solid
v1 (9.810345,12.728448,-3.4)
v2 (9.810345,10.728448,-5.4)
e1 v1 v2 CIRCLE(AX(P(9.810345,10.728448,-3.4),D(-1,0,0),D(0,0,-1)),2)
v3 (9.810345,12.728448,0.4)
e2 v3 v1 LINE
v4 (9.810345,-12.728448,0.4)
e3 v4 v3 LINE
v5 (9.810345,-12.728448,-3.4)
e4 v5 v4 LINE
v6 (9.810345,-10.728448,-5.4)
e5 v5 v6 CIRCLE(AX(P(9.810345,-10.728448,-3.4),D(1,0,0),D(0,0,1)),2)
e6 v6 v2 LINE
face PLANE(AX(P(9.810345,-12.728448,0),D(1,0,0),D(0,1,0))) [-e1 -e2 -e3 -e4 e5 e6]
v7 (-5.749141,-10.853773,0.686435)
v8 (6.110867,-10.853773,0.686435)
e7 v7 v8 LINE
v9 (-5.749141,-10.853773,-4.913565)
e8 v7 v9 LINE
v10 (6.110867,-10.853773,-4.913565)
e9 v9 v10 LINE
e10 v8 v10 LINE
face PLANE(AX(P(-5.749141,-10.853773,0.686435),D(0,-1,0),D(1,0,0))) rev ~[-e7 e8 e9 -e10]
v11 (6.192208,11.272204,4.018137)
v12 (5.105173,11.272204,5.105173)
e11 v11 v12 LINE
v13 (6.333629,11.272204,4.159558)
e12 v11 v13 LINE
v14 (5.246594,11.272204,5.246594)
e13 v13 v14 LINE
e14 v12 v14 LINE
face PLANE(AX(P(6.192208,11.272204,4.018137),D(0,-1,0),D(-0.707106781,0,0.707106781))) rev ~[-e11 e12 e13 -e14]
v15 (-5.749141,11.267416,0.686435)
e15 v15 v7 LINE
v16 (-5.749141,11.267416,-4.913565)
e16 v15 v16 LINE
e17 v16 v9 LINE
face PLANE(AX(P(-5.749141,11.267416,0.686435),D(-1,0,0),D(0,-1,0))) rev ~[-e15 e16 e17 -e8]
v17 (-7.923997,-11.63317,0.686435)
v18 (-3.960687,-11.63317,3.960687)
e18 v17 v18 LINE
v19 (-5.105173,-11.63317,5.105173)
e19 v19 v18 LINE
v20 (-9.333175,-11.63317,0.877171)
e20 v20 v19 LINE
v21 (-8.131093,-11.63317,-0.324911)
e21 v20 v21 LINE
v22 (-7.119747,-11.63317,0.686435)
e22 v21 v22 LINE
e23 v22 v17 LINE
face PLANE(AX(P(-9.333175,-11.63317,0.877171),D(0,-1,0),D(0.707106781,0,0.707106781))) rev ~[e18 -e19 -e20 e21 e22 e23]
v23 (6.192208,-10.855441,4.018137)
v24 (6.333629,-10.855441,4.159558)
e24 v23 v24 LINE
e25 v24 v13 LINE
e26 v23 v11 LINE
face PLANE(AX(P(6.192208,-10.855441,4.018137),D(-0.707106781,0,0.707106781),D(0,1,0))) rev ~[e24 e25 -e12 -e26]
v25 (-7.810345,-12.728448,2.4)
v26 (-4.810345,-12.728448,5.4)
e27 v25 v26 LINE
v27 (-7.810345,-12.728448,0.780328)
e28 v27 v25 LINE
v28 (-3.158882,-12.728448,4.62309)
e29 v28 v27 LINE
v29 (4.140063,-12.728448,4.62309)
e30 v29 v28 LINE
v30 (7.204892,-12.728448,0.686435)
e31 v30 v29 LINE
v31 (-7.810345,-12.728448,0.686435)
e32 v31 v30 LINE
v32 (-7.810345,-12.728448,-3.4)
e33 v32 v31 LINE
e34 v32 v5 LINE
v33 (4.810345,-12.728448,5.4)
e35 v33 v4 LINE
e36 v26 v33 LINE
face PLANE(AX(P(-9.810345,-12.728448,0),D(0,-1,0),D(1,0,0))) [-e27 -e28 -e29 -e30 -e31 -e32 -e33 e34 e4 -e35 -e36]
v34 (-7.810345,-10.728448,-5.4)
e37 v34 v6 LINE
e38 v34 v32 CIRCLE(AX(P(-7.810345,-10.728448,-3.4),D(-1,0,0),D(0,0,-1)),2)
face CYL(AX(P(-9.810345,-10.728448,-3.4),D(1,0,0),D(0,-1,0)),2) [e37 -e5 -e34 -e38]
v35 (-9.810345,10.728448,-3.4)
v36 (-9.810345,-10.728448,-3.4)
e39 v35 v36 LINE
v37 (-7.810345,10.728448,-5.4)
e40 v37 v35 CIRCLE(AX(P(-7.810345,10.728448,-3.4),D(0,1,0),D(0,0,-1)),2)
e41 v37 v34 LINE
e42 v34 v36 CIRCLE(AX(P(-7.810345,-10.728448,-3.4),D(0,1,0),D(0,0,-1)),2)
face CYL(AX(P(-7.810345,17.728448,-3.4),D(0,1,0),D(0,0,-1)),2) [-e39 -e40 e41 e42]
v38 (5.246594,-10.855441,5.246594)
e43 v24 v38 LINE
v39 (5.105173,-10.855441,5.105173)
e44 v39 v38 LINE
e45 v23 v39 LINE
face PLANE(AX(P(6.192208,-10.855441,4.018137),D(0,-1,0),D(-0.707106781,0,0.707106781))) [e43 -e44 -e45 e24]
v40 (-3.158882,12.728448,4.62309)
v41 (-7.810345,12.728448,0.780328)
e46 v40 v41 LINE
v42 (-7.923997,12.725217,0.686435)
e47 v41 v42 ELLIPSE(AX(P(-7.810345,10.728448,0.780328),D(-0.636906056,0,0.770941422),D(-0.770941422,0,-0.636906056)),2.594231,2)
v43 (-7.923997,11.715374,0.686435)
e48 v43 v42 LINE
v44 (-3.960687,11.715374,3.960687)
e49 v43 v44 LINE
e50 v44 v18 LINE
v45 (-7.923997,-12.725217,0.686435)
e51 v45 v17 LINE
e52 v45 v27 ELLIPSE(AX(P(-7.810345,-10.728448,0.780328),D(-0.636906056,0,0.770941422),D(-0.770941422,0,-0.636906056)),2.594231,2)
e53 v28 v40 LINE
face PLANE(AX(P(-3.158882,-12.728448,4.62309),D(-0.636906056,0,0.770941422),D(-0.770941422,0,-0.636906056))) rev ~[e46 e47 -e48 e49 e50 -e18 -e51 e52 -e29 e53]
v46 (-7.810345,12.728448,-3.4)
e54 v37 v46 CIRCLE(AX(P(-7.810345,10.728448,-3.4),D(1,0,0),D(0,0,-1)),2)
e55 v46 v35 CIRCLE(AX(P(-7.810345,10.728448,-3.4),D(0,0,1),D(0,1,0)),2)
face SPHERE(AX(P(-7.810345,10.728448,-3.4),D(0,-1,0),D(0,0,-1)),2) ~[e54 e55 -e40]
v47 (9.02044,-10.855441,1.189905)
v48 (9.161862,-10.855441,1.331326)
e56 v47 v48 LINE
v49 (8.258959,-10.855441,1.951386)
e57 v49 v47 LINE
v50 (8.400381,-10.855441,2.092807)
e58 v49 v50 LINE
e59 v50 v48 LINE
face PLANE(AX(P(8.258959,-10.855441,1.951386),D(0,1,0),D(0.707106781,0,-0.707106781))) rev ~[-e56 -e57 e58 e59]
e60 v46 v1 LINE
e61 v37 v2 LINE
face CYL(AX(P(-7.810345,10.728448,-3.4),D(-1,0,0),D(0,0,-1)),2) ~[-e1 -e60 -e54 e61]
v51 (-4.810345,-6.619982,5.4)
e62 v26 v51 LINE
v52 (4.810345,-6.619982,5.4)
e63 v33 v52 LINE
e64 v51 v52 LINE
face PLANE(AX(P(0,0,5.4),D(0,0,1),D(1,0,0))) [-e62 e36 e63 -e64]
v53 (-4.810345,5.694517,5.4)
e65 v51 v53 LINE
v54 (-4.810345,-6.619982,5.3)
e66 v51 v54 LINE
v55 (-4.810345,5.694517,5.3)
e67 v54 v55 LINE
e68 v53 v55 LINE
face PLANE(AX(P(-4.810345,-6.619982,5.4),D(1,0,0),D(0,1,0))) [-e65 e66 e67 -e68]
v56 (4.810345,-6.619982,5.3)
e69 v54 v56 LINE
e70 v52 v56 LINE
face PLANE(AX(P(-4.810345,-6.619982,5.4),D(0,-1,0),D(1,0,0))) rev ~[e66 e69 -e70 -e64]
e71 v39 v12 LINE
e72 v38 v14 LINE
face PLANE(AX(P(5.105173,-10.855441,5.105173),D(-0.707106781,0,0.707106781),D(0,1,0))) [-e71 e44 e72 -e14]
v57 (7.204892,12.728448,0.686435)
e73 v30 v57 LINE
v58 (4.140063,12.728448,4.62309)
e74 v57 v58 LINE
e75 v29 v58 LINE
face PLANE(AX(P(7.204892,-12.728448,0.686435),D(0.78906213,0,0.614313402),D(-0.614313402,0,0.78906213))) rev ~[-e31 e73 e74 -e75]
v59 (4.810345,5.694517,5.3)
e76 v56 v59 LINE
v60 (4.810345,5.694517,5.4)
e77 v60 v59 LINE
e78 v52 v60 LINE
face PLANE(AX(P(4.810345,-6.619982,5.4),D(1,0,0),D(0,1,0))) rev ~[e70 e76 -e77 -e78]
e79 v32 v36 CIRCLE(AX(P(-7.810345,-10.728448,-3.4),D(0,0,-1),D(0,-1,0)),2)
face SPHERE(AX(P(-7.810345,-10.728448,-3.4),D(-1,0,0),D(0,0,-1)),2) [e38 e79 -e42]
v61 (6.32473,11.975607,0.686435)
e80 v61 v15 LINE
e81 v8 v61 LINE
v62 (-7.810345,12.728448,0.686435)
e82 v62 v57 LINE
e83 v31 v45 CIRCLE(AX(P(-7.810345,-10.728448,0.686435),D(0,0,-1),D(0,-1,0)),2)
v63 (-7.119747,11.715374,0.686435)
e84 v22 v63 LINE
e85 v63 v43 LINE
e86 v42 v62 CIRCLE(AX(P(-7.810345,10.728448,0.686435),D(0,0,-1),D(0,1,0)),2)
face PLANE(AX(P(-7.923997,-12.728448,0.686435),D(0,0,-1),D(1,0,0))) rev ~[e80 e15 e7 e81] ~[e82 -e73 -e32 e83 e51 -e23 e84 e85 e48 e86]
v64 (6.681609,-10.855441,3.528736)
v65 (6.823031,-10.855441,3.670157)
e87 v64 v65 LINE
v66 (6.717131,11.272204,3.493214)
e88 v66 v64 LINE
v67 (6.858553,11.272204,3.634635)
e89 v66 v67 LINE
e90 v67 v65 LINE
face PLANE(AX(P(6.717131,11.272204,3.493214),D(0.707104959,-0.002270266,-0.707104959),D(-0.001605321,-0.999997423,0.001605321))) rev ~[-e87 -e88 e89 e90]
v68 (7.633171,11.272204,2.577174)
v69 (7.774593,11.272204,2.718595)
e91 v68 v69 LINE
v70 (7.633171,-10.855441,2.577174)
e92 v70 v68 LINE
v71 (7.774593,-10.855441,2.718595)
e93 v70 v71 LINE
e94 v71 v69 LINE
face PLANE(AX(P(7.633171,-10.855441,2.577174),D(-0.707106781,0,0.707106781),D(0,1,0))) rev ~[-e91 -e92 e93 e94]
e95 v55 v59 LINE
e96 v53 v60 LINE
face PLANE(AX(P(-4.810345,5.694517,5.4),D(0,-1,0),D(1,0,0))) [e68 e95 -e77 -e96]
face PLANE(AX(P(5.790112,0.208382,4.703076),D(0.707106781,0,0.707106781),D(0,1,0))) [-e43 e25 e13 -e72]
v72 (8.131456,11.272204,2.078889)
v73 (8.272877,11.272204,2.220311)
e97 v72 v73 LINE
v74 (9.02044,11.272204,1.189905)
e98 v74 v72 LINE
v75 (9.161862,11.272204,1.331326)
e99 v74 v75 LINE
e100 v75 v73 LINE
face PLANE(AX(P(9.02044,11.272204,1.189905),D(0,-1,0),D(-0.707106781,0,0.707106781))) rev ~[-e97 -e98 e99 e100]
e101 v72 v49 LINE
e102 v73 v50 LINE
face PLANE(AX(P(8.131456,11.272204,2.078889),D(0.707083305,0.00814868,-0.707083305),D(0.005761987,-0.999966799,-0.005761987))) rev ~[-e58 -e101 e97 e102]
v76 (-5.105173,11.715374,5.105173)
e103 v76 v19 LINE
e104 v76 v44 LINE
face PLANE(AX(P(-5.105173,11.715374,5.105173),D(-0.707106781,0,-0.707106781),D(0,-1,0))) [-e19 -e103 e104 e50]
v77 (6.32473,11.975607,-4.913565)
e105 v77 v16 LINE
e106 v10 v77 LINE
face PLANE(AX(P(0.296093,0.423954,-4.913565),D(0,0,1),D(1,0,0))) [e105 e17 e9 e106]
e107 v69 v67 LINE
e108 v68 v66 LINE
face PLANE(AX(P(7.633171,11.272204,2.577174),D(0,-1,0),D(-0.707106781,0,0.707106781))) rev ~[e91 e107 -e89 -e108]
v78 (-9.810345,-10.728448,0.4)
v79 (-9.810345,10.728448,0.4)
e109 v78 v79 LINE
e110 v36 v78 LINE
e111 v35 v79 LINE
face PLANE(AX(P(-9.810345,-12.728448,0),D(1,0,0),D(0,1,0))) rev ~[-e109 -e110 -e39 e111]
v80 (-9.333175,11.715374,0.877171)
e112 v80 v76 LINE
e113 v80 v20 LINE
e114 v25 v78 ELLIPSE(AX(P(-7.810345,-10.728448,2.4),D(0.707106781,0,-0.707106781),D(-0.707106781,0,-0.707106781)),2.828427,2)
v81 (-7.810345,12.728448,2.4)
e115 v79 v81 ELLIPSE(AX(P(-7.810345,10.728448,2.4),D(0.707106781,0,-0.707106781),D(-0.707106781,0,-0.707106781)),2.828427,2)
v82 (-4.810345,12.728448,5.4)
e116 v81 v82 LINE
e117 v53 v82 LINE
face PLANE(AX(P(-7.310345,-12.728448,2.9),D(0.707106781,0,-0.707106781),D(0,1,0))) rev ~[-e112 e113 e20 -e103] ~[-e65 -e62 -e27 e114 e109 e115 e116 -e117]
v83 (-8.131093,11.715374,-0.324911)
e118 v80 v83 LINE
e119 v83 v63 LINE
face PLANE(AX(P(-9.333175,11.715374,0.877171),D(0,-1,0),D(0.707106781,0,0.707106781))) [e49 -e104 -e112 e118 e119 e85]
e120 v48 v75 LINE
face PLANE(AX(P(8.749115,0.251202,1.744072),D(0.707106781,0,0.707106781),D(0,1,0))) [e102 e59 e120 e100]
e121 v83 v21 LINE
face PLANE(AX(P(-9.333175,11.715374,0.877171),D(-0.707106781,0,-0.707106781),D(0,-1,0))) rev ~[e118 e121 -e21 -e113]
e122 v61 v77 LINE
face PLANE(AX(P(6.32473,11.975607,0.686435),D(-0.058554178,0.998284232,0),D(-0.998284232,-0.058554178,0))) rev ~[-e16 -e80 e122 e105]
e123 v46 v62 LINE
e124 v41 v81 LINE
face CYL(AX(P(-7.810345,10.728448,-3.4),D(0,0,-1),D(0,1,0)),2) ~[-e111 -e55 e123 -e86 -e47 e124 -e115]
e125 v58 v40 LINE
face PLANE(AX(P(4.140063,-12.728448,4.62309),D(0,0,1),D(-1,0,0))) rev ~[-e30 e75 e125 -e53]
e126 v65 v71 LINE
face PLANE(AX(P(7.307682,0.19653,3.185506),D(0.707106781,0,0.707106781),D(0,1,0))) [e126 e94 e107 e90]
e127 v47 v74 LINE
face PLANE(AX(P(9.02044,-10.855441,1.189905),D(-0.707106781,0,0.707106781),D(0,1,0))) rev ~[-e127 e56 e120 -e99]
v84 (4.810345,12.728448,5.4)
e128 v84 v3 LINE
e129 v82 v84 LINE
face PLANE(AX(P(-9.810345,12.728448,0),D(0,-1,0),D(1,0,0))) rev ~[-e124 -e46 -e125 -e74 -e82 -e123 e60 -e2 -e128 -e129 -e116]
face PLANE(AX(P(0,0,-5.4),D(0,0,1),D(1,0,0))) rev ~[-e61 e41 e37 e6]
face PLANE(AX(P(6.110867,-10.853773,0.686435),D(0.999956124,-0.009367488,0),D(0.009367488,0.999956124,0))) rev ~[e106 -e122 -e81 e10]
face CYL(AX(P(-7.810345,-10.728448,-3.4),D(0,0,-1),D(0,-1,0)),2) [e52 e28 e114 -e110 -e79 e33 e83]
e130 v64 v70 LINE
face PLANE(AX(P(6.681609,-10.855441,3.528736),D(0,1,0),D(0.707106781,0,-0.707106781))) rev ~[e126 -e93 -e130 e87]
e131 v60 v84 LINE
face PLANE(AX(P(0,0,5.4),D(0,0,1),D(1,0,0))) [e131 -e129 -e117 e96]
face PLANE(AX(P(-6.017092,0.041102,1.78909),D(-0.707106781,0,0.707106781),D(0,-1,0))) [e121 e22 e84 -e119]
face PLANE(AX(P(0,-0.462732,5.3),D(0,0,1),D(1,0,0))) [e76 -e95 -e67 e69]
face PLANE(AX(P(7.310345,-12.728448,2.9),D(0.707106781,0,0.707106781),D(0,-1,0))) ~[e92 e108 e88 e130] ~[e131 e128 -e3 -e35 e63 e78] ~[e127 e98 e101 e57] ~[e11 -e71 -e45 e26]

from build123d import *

# Parameters (mm, degrees)
F0_W         = 19.62069033
F0_H         = 25.4568966
F1_DEPTH     = 5.4
F2_SIZE      = 5
F3_SIZE      = 5
F4_W         = 22.1276450902
F4_H         = 1.5373004135
F5_DEPTH     = 0.2
F7_DEPTH     = 25.5
F8_W         = 23.348543793
F8_H         = 5.9792976826
F9_DEPTH     = 1.7
F10_R        = 2
F11_T1_DEPTH = 28.4568966
F11_T3_DEPTH = 8.8
F11_T6_ANGLE = 90
F12_T1_DEPTH = 22.62069033
F12_T3_DEPTH = 8.8
F12_T6_ANGLE = 90.0000000053
F14_DEPTH    = 5.6
F15_W        = 9.62069033
F15_H        = 12.3144993559
F16_DEPTH    = 0.1


# Not quite as in the source:
# - a fillet or chamfer that OpenCascade refuses, or shapes differently, is made with other operations: its cross-section is extruded or revolved along the edge and cut away or added


with BuildPart() as f1:
    # F0 (on Top) → F1 (new body, symmetric)
    with BuildSketch(Plane.XY):
        Rectangle(F0_W, F0_H)
    extrude(amount=F1_DEPTH, both=True)

    # F2
    f2_edges = [f1.edges().sort_by_distance(p)[0] for p in [
        (-9.810345, 0, 5.4),
    ]]
    chamfer(f2_edges, length=F2_SIZE)

    # F3
    f3_edges = [f1.edges().sort_by_distance(p)[0] for p in [
        (9.810345, 0, 5.4),
    ]]
    chamfer(f3_edges, length=F3_SIZE)

    # F4 (on face) → F5 (join)
    with BuildSketch(Plane(origin=(5.1051725825, 0, 5.1051725825), x_dir=(0, 1, 0), z_dir=(0.7071067812, 0, 0.7071067812))):
        with Locations((0.2083815634, -0.7686502067)):
            Rectangle(F4_W, F4_H)
        Polygon((11.2722041085, -2.2796541452), (-10.8554409817, -2.2294183727), (-10.8554409817, -3.5751299001), (11.2722041085, -3.5751299001), align=None)
        Polygon((11.2722041085, -4.2798109353), (-10.8554409817, -4.4601280242), (-10.8554409817, -5.5370246992), (11.2722041085, -5.5370246992), align=None)
    extrude(amount=F5_DEPTH)

    # F6 (on face) → F7 (cut)
    with BuildSketch(Plane.XZ.offset(12.7284483)):
        Polygon((4.140063189, 4.6230903827), (-3.1588820275, 4.6230903827), (-7.9239970073, 0.6864351453), (7.2048916481, 0.6864351453), align=None)
    extrude(amount=-F7_DEPTH, mode=Mode.SUBTRACT)

    # F8 (on face) → F9 (cut)
    with BuildSketch(Plane(origin=(-5.1051725825, 0, 5.1051725825), x_dir=(0, -1, 0), z_dir=(-0.7071067812, 0, 0.7071067812))):
        with Locations((-0.0411020592, -2.9896488413)):
            Rectangle(F8_W, F8_H)
    extrude(amount=-F9_DEPTH, mode=Mode.SUBTRACT)

    # F10
    f10_edges = [f1.edges().sort_by_distance(p)[0] for p in [
        (0, -12.728448, -5.4),
    ]]
    fillet(f10_edges, radius=F10_R)

    # F11: fillet of radius 2 on 1 edges, made by hand

    # F11_s2 → F11_t1 (cut)
    with BuildSketch(Plane.XZ.offset(-17.7284483)):
        with BuildLine():
            ThreePointArc((-7.810345165, -5.4), (-9.2245587274, -4.8142135624), (-9.810345165, -3.4))
            Line((-9.810345165, -3.4), (-9.810345165, -5.4))
            Line((-9.810345165, -5.4), (-7.810345165, -5.4))
        make_face()
    extrude(amount=F11_T1_DEPTH, mode=Mode.SUBTRACT)

    # F11_s4 → F11_t3 (cut)
    with BuildSketch(Plane.XY.offset(-3.4)):
        with BuildLine():
            ThreePointArc((-7.810345165, -12.7284483), (-9.2245587274, -12.1426618624), (-9.810345165, -10.7284483))
            Line((-9.810345165, -10.7284483), (-9.810345165, -12.7284483))
            Line((-9.810345165, -12.7284483), (-7.810345165, -12.7284483))
        make_face()
    extrude(amount=F11_T3_DEPTH, mode=Mode.SUBTRACT)

    # F11_s5 → F11_t6 (revolve, cut)
    with BuildSketch(Plane.XZ.offset(10.7284483)):
        with BuildLine():
            ThreePointArc((-7.810345165, -5.4), (-9.2245587274, -4.8142135624), (-9.810345165, -3.4))
            Line((-9.810345165, -3.4), (-9.810345165, -5.4))
            Line((-9.810345165, -5.4), (-7.810345165, -5.4))
        make_face()
    revolve(axis=Axis((-9.810345165, -10.7284483, -3.4), (-1, 0, 0)), revolution_arc=F11_T6_ANGLE, mode=Mode.SUBTRACT)

    # F12: fillet of radius 2 on 1 edges, made by hand

    # F12_s2 → F12_t1 (cut)
    with BuildSketch(Plane.YZ.offset(-7.810345165)):
        with BuildLine():
            ThreePointArc((10.7284483, -5.4), (12.1426618624, -4.8142135624), (12.7284483, -3.4))
            Line((12.7284483, -3.4), (12.7284483, -5.4))
            Line((12.7284483, -5.4), (10.7284483, -5.4))
        make_face()
    extrude(amount=F12_T1_DEPTH, mode=Mode.SUBTRACT)

    # F12_s4 → F12_t3 (cut)
    with BuildSketch(Plane.XY.offset(-3.4)):
        with BuildLine():
            ThreePointArc((-7.810345165, 12.7284483), (-9.2245587274, 12.1426618624), (-9.810345165, 10.7284483))
            Line((-9.810345165, 10.7284483), (-9.810345165, 12.7284483))
            Line((-9.810345165, 12.7284483), (-7.810345165, 12.7284483))
        make_face()
    extrude(amount=F12_T3_DEPTH, mode=Mode.SUBTRACT)

    # F12_s5 → F12_t6 (revolve, cut)
    with BuildSketch(Plane.YZ.offset(-7.8103451651)):
        with BuildLine():
            ThreePointArc((12.7284483, -3.4), (12.1426618624, -4.8142135624), (10.7284483, -5.4))
            Line((10.7284483, -5.4), (12.7284483, -5.4))
            Line((12.7284483, -5.4), (12.7284483, -3.4))
        make_face()
    revolve(axis=Axis((-7.8103451651, 12.7284483, -3.4000000001), (0, 1, 0)), revolution_arc=F12_T6_ANGLE, mode=Mode.SUBTRACT)

    # F13 (on face) → F14 (cut)
    with BuildSketch(Plane.XY.offset(0.6864351453)):
        Polygon((6.1108670197, -10.853772983), (6.3247303478, 11.9756069034), (-5.7491413318, 11.2674161792), (-5.7491413318, -10.853772983), align=None)
    extrude(amount=-F14_DEPTH, mode=Mode.SUBTRACT)

    # F15 (on face) → F16 (cut)
    with BuildSketch(Plane.XY.offset(5.4)):
        with Locations((0, -0.4627322778)):
            Rectangle(F15_W, F15_H)
    extrude(amount=-F16_DEPTH, mode=Mode.SUBTRACT)


solid = f1.part
